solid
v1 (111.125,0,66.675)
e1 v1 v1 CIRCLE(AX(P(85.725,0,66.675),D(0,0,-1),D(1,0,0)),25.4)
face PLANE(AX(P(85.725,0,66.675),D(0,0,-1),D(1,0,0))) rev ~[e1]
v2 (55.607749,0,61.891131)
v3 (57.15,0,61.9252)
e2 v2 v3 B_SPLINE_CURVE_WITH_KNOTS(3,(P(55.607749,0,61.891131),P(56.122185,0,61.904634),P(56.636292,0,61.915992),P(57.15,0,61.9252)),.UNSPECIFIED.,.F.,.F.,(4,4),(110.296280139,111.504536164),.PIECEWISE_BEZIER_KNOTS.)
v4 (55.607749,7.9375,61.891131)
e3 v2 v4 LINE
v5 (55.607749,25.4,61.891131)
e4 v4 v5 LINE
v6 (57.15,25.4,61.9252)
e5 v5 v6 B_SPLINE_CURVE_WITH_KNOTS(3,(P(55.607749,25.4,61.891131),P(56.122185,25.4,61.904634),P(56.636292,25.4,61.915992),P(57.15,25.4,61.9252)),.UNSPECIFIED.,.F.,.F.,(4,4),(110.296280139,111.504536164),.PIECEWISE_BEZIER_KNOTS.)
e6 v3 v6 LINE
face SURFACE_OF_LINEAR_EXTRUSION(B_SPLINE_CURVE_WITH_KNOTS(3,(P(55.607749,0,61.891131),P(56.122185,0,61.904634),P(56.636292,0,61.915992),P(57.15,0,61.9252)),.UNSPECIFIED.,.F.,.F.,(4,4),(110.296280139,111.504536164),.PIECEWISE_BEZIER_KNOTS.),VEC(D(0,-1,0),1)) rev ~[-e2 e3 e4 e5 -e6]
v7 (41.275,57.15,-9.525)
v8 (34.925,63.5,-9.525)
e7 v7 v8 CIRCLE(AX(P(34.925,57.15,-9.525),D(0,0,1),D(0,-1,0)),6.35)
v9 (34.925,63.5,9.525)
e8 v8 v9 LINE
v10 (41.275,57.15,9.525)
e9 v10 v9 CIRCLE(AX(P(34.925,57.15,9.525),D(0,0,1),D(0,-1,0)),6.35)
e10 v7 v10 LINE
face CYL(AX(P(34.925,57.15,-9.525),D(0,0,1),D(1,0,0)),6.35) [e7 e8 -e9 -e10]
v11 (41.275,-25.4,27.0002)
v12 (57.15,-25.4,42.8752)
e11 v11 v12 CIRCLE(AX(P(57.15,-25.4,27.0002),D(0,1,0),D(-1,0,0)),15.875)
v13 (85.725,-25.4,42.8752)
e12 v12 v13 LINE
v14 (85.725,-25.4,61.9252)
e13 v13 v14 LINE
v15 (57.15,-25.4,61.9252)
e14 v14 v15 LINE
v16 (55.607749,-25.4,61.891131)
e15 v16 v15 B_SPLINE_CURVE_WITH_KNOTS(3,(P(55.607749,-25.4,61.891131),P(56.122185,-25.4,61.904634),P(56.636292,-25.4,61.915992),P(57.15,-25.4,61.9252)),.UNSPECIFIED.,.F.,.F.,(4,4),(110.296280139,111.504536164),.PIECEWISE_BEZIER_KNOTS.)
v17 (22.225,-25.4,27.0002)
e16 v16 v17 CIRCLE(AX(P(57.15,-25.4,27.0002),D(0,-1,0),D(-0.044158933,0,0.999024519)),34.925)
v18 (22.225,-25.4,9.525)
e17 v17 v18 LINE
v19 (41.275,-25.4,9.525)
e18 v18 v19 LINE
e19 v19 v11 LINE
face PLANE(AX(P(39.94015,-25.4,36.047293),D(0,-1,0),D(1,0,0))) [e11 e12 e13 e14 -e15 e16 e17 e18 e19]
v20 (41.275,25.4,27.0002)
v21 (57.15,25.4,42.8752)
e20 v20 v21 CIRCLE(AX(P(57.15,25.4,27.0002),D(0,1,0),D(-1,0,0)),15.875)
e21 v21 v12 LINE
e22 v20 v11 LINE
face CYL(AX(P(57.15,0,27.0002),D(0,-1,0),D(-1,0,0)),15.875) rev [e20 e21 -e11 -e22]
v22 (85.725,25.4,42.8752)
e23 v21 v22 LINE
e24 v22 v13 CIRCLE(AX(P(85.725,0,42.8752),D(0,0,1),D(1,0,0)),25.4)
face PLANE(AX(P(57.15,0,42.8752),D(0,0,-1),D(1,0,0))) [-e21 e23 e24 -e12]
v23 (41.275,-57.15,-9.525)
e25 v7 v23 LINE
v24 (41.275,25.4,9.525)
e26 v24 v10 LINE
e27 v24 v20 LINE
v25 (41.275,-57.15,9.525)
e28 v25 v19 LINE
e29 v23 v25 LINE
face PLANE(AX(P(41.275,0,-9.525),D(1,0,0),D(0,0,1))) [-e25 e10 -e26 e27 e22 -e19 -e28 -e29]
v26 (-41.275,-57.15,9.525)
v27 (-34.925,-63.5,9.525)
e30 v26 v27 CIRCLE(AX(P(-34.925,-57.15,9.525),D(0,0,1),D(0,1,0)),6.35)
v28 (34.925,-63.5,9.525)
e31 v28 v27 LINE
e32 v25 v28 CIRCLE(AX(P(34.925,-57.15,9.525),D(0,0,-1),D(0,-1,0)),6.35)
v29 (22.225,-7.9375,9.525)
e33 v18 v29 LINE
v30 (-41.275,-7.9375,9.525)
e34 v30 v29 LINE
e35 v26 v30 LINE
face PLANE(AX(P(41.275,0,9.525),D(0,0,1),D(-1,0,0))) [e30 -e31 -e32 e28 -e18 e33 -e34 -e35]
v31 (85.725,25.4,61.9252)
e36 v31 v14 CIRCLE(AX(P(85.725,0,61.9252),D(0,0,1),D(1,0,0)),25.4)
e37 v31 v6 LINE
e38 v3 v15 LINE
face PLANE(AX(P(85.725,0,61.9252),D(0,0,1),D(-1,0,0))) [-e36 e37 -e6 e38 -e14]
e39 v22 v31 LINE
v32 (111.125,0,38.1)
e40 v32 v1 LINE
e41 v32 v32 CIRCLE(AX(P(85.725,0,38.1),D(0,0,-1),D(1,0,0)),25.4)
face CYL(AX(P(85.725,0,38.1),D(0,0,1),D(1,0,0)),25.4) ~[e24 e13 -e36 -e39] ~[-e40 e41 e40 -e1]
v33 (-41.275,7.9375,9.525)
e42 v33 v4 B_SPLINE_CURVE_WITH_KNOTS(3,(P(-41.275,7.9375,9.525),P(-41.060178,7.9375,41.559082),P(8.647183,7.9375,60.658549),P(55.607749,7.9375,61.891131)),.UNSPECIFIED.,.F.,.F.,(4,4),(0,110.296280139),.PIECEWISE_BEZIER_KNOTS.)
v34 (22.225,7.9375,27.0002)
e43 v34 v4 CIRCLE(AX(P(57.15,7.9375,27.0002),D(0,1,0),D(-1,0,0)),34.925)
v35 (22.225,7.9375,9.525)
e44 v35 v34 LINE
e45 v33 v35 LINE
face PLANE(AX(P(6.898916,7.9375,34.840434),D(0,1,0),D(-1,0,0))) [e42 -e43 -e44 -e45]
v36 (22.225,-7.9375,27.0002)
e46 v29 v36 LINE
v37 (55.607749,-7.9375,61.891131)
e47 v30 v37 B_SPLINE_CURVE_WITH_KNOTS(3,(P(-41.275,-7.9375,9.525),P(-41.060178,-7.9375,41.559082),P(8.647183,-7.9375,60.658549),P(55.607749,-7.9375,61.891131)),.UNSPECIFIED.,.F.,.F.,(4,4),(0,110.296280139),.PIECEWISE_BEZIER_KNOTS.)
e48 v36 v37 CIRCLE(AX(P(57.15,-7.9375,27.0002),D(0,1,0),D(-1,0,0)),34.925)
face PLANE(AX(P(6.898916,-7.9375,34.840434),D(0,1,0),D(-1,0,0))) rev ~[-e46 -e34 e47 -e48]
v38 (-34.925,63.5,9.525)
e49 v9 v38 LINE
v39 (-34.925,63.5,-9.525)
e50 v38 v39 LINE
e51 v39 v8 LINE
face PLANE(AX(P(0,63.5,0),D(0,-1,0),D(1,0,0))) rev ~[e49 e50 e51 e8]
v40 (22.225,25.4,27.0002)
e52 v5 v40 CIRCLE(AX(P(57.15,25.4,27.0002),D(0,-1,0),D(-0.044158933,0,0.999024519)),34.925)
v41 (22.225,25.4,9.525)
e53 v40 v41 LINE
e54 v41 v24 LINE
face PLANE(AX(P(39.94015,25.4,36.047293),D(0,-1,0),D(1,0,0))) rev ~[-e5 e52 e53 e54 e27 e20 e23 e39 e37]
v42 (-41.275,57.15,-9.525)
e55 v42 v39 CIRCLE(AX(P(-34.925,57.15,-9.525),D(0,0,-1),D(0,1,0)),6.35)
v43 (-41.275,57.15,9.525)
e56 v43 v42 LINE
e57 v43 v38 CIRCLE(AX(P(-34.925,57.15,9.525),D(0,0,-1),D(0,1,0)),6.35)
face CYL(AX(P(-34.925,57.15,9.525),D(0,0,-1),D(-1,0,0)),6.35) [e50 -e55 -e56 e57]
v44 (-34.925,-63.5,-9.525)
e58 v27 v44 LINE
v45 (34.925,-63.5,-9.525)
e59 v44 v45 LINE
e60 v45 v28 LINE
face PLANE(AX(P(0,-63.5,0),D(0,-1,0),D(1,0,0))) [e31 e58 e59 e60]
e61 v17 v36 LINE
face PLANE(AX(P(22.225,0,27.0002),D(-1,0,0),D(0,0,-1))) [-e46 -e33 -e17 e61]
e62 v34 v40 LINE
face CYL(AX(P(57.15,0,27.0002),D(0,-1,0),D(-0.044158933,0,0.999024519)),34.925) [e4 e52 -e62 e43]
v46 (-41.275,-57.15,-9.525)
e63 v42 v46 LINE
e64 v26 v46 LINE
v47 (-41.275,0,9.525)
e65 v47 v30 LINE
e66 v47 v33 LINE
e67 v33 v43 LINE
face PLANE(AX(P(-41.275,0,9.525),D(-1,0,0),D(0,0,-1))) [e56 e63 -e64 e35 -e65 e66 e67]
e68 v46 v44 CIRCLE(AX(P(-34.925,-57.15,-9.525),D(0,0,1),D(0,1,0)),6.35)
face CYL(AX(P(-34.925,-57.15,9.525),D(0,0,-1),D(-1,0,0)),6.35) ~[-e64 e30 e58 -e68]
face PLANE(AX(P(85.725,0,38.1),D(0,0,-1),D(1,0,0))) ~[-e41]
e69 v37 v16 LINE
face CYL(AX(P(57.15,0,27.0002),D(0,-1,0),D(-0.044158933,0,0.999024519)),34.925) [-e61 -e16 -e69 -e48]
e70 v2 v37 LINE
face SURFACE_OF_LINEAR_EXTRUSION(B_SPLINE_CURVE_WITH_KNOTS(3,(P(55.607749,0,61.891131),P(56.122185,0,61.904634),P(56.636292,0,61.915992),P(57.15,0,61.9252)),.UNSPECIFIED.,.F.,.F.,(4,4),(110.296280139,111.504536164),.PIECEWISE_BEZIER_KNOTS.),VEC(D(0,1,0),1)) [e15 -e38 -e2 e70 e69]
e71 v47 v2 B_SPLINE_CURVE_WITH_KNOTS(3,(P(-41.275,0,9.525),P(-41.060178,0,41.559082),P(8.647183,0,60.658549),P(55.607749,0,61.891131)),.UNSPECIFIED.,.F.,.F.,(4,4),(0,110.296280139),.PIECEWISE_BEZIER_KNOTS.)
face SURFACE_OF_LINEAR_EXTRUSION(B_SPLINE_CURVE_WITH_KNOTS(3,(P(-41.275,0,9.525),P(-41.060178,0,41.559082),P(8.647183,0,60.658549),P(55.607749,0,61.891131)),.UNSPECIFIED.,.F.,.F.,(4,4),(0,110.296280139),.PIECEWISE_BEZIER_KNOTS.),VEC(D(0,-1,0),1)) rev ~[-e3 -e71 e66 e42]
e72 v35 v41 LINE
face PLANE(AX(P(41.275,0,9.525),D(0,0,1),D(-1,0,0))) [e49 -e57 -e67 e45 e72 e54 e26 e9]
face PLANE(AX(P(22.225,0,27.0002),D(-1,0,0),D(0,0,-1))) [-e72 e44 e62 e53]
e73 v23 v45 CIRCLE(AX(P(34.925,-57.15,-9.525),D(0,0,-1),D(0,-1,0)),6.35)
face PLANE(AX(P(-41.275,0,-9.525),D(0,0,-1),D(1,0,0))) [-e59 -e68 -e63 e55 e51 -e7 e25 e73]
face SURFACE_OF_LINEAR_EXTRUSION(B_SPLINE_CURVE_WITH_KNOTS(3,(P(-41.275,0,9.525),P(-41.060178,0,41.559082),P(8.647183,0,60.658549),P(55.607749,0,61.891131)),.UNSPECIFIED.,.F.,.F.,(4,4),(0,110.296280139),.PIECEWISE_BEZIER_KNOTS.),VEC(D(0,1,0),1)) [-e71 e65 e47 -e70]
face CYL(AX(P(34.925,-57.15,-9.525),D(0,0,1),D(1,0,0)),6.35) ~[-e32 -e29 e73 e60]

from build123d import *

# Parameters (mm, degrees)
F1_DEPTH = 63.5
F0_W     = 25.4
F0_H     = 19.05
F2_DEPTH = 25.4
F3_DEPTH = 7.9375
F5_R     = 6.35


# Not quite as in the source:
# - a feature names something its author has since deleted; it is built from what else it names


with BuildPart() as f1:
    # F0 (on Front) → F1 (new body, symmetric)
    with BuildSketch(Plane.XZ):
        Polygon((-41.275, 9.525), (-41.275, -9.525), (41.275, -9.525), (41.275, 9.525), (22.225, 9.525), align=None)
    extrude(amount=F1_DEPTH, both=True)

    # F0 (on Front) → F2 (join, symmetric)
    with BuildSketch(Plane.XZ):
        with BuildLine():
            Line((22.225, 9.525), (41.275, 9.525))
            Line((41.275, 9.525), (41.275, 27.0002))
            ThreePointArc((41.275, 27.0002), (45.9246798487, 38.2255201513), (57.15, 42.8752))
            Line((57.15, 42.8752), (60.325, 42.8752))
            Line((60.325, 42.8752), (60.325, 61.9252))
            Line((60.325, 61.9252), (57.15, 61.9252))
            add(Edge.make_bspline(
                [(55.607749268, 61.89113131), (56.1221853633, 61.9046338014), (56.6362918319, 61.9159921928), (57.15, 61.9252)],
                knots=[110.2962801392, 110.2962801392, 110.2962801392, 110.2962801392, 111.5045361635, 111.5045361635, 111.5045361635, 111.5045361635], degree=3))
            ThreePointArc((55.607749268, 61.89113131), (31.9149179532, 51.1444800491), (22.225, 27.0002))
            Line((22.225, 27.0002), (22.225, 9.525))
        make_face()
        with Locations((73.025, 52.4002)):
            Rectangle(F0_W, F0_H)
    extrude(amount=F2_DEPTH, both=True)

    # F0 (on Front) → F3 (join, symmetric)
    with BuildSketch(Plane.XZ):
        with BuildLine():
            add(Edge.make_bspline(
                [(-41.275, 9.525), (-41.060178382, 41.5590820395), (8.6471825165, 60.6585493514), (55.607749268, 61.89113131)],
                knots=[0, 0, 0, 0, 110.2962801392, 110.2962801392, 110.2962801392, 110.2962801392], degree=3))
            Line((-41.275, 9.525), (22.225, 9.525))
            Line((22.225, 9.525), (22.225, 27.0002))
            ThreePointArc((22.225, 27.0002), (31.9149179532, 51.1444800491), (55.607749268, 61.89113131))
        make_face()
    extrude(amount=F3_DEPTH, both=True)

    # F0 (on Front) → F4 (revolve)
    with BuildSketch(Plane.XZ):
        Polygon((85.725, 66.675), (85.725, 61.9252), (85.725, 42.8752), (85.725, 38.1), (111.125, 38.1), (111.125, 66.675), align=None)
    revolve(axis=Axis((85.725, 0, 52.3875), (0, 0, -1)))

    # F5
    f5_edges = [f1.edges().sort_by_distance(p)[0] for p in [
        (41.275, -63.5, 0),
        (41.275, 63.5, 0),
        (-41.275, -63.5, 0),
        (-41.275, 63.5, 0),
    ]]
    fillet(f5_edges, radius=F5_R)


solid = f1.part
